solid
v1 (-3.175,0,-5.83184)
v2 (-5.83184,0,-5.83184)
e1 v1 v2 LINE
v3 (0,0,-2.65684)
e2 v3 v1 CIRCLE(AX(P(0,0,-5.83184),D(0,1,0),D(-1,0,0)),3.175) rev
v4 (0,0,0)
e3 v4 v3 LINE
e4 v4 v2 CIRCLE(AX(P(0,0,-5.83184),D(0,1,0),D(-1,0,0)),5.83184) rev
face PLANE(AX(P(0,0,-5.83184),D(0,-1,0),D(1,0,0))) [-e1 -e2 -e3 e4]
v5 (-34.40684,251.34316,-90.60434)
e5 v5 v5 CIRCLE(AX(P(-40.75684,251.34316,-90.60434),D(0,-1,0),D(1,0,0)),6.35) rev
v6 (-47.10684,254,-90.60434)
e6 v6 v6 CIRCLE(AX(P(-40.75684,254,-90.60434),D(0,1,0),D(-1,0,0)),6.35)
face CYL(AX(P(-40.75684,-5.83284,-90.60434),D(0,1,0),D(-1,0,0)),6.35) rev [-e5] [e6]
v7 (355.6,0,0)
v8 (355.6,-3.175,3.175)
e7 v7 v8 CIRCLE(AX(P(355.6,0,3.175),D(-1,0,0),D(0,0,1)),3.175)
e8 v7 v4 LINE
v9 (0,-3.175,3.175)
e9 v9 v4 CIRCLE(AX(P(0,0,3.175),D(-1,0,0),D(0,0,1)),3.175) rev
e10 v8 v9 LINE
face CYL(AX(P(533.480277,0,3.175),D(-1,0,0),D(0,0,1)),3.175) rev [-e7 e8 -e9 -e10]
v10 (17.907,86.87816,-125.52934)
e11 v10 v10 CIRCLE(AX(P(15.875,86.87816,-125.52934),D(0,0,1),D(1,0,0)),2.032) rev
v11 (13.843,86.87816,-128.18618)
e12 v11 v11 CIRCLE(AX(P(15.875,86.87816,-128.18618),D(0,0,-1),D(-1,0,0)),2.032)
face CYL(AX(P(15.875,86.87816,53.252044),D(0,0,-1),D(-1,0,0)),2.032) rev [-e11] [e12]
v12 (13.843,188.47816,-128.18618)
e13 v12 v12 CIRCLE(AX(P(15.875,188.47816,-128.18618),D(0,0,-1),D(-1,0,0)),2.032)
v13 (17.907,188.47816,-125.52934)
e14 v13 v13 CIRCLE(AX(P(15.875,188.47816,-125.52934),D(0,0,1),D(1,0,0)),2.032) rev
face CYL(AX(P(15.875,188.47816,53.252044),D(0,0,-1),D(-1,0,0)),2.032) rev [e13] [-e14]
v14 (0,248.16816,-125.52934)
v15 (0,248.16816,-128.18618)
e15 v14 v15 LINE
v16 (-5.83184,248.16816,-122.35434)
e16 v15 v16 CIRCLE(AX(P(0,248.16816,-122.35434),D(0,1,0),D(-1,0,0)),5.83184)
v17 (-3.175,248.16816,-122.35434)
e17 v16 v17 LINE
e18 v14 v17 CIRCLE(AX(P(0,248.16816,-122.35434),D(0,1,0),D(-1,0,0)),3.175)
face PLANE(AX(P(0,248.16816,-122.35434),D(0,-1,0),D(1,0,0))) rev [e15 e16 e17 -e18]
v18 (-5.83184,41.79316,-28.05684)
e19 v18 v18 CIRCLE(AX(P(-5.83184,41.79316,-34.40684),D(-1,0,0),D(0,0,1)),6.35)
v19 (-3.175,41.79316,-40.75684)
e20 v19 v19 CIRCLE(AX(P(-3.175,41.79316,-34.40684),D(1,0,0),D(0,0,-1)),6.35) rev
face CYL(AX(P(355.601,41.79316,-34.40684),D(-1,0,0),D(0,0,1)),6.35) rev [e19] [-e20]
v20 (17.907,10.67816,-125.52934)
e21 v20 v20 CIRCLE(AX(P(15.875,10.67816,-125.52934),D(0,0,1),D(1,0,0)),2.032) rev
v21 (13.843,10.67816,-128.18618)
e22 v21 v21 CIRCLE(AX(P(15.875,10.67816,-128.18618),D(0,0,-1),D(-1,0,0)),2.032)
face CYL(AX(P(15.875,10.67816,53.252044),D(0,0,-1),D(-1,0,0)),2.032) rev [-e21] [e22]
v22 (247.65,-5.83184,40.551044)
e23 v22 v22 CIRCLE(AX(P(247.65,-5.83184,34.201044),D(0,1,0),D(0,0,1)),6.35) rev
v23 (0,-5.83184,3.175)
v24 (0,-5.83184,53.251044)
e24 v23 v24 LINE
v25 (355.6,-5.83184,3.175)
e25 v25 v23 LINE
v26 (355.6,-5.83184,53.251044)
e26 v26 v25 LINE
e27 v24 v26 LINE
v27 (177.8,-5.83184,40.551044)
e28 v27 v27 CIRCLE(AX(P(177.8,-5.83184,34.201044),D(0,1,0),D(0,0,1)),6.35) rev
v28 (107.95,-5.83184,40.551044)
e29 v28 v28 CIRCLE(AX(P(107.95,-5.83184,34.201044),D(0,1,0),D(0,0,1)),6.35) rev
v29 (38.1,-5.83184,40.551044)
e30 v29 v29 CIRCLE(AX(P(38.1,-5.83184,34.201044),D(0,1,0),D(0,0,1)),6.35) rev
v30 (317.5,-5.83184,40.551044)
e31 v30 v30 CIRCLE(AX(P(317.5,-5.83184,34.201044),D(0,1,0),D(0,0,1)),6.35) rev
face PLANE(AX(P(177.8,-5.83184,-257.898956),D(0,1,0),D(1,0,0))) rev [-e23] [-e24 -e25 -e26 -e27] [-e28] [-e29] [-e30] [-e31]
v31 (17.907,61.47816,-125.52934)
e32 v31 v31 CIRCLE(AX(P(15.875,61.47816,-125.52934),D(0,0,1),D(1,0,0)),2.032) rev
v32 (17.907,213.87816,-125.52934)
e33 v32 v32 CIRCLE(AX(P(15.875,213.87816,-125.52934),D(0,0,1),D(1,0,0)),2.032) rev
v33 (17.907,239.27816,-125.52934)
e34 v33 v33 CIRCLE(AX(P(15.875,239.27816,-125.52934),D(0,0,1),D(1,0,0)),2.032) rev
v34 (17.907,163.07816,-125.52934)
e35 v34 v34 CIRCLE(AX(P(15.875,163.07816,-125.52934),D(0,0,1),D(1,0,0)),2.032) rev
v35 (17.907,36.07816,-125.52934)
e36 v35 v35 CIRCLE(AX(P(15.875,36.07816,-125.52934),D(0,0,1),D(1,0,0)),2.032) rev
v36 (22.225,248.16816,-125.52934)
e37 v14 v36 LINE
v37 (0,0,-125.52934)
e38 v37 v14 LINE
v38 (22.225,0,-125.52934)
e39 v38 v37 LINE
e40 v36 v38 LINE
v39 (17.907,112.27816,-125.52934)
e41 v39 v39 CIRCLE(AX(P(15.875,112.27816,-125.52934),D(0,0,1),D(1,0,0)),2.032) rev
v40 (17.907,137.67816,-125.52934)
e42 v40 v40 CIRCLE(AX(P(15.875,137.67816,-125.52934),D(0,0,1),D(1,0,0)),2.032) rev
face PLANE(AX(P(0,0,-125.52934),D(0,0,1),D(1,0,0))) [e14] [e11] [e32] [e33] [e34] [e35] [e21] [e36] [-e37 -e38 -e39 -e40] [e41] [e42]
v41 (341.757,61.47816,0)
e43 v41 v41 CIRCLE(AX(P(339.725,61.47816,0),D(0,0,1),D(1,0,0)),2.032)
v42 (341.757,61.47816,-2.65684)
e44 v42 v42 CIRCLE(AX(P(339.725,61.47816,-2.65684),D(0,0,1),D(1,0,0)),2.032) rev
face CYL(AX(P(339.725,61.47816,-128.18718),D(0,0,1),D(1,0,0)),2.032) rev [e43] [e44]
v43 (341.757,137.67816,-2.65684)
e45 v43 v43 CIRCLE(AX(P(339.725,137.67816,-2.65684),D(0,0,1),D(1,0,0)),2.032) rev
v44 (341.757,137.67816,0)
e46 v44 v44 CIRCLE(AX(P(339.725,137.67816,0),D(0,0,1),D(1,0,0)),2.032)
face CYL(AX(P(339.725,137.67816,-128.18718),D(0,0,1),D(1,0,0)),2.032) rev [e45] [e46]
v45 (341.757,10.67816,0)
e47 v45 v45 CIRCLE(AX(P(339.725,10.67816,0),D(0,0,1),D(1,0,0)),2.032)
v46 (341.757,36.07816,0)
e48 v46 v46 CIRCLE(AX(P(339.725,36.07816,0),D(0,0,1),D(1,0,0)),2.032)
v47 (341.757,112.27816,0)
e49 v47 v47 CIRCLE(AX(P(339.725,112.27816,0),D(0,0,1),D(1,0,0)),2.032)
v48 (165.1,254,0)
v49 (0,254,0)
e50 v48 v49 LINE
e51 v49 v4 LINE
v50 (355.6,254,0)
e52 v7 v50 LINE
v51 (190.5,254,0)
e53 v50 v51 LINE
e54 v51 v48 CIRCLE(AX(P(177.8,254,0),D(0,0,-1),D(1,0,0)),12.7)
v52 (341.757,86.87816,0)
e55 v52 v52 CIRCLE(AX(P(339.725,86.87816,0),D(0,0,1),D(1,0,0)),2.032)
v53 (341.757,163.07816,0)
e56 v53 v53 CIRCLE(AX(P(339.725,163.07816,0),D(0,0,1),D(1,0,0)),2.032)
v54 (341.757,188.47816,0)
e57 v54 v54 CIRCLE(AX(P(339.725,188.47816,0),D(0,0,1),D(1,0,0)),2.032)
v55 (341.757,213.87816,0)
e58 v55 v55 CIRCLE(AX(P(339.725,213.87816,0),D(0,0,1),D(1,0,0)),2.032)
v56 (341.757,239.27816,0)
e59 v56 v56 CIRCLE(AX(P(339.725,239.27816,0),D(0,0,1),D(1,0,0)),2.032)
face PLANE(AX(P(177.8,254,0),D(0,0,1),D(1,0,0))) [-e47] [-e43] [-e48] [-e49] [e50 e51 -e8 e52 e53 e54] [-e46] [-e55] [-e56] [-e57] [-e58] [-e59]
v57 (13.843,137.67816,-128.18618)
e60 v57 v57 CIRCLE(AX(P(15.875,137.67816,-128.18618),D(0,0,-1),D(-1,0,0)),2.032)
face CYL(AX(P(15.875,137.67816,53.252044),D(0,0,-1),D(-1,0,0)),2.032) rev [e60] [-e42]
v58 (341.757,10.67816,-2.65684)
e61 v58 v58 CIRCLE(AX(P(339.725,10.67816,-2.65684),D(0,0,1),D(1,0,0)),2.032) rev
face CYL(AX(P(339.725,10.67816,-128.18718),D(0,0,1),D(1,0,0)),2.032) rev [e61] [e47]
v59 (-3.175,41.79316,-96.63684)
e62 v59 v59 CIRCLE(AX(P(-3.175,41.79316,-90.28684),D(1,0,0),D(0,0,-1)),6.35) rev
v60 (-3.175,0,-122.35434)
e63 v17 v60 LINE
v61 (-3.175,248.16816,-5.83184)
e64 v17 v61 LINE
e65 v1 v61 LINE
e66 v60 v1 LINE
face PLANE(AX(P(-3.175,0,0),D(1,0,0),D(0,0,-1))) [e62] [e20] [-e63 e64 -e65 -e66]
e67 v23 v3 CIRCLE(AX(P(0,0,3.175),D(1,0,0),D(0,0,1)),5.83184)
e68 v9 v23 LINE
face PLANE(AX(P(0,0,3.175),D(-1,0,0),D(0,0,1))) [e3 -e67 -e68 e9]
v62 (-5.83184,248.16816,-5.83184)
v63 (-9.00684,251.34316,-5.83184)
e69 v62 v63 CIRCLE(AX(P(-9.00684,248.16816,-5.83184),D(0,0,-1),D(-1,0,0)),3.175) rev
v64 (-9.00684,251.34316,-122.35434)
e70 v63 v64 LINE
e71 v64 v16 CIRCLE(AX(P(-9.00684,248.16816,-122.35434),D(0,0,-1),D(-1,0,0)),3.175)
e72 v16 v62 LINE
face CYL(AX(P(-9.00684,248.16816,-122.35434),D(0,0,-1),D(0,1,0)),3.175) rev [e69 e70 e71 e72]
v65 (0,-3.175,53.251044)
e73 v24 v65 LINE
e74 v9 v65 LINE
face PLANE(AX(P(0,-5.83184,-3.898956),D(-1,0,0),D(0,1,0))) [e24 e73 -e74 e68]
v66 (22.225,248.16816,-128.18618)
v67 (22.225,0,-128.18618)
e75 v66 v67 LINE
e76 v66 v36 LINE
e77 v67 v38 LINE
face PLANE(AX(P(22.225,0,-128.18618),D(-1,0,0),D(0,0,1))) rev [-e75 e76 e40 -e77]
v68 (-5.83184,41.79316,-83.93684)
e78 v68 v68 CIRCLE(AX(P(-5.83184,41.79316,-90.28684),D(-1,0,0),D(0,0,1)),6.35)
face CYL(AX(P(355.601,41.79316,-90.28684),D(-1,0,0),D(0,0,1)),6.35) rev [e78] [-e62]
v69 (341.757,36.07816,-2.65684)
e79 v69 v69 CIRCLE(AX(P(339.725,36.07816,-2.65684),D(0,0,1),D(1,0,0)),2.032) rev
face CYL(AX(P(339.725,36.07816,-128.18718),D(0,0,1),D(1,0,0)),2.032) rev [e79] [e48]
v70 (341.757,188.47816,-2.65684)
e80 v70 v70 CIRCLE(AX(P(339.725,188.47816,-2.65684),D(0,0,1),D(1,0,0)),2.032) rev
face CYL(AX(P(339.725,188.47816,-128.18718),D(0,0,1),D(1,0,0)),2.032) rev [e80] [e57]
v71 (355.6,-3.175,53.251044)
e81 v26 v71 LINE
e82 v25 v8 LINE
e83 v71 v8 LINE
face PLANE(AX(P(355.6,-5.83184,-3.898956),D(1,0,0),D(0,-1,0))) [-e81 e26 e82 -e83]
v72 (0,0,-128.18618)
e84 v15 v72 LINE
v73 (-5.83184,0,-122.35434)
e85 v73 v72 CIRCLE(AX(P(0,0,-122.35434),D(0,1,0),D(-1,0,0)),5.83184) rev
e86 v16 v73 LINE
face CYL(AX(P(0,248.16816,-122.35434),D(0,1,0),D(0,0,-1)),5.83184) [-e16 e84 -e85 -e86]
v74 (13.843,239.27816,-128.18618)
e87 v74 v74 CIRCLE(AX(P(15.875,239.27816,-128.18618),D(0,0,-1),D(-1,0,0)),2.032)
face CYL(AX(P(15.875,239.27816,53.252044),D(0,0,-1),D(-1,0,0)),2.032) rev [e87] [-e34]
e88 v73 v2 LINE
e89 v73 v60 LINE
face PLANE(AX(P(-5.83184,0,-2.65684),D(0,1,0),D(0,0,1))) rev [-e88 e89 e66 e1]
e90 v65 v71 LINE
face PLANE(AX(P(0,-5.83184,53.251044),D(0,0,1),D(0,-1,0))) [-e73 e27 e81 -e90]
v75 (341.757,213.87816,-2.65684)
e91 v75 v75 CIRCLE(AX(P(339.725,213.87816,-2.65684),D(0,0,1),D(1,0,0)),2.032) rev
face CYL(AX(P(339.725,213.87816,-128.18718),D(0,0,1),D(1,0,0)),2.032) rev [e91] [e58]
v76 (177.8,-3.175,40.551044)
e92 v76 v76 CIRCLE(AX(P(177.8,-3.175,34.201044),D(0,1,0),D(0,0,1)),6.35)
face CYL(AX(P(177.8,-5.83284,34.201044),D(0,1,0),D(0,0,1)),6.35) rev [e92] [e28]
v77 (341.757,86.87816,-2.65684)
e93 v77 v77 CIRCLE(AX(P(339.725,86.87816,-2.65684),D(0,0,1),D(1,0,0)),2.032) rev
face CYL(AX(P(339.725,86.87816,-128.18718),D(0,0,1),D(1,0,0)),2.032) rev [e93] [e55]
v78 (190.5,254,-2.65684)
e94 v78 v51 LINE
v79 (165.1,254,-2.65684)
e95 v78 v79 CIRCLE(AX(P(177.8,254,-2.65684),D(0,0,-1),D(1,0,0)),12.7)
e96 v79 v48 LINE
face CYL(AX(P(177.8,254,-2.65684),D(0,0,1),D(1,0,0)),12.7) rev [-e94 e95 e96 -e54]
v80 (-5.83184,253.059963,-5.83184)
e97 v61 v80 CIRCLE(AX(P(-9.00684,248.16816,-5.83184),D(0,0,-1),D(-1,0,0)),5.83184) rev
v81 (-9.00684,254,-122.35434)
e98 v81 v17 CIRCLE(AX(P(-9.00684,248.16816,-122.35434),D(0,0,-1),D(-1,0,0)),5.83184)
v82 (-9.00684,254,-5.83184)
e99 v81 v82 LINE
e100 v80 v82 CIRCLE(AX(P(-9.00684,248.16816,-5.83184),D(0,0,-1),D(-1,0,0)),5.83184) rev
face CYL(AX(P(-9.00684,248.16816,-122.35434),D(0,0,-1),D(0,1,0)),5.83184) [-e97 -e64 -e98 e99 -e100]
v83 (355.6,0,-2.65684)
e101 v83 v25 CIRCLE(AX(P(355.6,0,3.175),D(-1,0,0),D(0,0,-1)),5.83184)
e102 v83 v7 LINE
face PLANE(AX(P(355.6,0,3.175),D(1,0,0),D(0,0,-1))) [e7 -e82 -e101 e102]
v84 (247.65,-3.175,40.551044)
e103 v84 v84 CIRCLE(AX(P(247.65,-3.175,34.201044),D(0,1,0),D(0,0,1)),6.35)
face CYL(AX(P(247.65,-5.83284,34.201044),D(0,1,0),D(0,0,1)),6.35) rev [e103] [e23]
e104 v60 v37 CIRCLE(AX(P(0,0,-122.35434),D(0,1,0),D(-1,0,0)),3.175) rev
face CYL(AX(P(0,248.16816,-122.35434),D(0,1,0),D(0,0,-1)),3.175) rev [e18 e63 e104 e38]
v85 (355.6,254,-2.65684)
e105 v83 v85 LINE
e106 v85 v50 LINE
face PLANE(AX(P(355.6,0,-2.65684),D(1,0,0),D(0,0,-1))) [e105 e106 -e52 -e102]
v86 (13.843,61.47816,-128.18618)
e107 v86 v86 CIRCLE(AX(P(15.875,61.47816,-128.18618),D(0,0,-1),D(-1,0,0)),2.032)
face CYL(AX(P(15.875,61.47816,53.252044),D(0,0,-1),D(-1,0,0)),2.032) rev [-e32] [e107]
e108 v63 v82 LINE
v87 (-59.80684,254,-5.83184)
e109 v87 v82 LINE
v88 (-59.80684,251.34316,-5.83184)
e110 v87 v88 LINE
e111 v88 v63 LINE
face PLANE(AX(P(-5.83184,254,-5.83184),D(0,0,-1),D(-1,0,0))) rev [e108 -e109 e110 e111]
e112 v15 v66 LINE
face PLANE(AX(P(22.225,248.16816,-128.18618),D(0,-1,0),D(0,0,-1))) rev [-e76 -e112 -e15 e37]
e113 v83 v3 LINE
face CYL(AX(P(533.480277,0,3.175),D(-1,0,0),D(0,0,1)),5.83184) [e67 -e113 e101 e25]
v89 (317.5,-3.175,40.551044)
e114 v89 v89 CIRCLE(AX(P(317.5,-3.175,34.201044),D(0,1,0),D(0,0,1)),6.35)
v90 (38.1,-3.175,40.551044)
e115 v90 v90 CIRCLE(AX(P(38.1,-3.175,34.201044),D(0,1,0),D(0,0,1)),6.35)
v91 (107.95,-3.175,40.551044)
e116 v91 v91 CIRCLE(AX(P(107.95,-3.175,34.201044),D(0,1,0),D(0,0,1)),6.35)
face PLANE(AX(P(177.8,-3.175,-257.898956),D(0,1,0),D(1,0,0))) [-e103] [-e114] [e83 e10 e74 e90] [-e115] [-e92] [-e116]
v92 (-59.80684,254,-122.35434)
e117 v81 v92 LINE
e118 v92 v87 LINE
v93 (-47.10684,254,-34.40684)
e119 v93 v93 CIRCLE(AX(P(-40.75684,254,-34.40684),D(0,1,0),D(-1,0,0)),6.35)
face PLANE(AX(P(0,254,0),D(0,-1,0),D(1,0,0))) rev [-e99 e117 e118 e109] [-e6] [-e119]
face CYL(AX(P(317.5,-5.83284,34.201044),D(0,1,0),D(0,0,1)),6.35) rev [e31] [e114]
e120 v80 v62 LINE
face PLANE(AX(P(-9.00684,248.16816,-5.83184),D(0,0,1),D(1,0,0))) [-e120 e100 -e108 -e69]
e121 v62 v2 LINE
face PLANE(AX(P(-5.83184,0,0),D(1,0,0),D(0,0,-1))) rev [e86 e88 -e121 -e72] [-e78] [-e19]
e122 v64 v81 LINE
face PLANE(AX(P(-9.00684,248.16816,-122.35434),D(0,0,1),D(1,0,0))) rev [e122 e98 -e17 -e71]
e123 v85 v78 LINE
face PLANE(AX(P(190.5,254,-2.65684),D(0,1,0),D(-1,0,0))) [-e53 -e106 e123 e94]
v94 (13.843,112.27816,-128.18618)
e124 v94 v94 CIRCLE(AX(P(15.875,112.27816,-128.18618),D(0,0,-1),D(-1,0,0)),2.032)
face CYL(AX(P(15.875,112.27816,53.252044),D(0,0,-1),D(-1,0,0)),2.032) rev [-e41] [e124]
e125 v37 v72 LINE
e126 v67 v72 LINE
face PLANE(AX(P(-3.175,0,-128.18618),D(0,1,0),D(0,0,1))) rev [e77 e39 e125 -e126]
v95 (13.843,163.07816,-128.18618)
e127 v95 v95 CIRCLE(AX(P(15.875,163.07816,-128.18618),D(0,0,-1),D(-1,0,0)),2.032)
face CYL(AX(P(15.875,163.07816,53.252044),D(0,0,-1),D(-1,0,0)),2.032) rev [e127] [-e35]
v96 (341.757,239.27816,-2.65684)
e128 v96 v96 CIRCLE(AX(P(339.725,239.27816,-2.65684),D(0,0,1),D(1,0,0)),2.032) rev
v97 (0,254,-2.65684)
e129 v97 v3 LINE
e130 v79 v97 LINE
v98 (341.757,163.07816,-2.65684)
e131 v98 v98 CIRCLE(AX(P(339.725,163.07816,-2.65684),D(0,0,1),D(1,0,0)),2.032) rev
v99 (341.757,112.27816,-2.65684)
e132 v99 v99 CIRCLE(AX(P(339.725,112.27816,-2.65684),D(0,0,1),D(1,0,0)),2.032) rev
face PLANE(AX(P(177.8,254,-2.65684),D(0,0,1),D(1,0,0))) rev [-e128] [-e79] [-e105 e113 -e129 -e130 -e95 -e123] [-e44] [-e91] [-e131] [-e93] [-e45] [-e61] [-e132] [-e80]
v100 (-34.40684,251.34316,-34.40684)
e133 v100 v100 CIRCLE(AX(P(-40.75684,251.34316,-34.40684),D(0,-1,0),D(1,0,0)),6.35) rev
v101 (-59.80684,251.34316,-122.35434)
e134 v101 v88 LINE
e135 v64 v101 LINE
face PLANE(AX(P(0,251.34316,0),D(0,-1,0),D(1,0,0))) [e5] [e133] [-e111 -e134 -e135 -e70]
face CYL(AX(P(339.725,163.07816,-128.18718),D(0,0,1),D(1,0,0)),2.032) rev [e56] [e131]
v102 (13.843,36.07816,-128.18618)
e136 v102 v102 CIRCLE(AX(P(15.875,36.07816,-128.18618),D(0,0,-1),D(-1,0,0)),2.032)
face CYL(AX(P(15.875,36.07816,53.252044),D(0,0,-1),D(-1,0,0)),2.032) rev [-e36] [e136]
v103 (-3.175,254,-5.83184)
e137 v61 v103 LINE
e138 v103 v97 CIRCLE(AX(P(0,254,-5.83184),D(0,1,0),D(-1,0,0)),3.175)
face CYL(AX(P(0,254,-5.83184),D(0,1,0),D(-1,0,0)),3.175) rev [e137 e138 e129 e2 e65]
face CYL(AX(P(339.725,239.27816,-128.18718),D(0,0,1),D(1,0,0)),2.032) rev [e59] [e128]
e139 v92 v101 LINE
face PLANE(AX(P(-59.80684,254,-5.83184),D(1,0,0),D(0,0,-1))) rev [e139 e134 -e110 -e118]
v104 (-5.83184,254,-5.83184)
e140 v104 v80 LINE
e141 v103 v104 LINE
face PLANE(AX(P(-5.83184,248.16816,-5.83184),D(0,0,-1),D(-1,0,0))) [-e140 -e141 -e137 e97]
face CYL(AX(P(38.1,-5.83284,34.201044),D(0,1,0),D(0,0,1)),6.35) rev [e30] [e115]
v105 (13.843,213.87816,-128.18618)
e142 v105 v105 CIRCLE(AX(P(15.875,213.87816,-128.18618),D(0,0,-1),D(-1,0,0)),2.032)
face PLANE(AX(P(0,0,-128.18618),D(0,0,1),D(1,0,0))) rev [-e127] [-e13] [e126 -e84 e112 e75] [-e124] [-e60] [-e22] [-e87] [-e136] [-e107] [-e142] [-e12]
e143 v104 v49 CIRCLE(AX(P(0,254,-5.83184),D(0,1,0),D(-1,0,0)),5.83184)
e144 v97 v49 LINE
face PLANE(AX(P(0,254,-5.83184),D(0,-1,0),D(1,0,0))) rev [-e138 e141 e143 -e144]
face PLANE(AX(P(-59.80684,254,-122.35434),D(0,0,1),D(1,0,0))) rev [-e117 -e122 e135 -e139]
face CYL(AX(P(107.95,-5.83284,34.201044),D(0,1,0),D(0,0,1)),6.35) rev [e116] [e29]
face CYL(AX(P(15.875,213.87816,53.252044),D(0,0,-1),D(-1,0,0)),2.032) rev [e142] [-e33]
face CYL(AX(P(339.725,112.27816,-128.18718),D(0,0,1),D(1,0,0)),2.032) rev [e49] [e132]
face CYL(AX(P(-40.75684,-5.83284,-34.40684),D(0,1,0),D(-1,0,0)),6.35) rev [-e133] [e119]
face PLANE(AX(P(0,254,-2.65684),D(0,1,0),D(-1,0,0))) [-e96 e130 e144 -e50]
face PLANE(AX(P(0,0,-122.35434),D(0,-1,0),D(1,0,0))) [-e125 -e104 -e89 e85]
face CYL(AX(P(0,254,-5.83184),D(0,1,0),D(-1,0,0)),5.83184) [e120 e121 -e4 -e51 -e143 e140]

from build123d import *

# Parameters (mm, degrees)
BASE_FLANGE1_DEPTH           = 2.65684
SKETCHED_BEND3_DEPTH         = 355.6
SKETCHED_BEND3_2_DEPTH       = 355.6
SKETCH10_R                   = 6.35
CUT_EXTRUDE2_DEPTH           = 2.65684
EDGE_FLANGE5_DEPTH           = 254
EDGE_FLANGE6_STRIP_W         = 16.97736
EDGE_FLANGE6_STRIP_H         = 2.65684
EDGE_FLANGE6_STRIP_CUT_DEPTH = 116.5225
EDGE_FLANGE6_DEPTH           = 116.5225
EDGE_FLANGE7_DEPTH           = 248.16816
SKETCH34_R                   = 6.35
CUT_EXTRUDE3_DEPTH           = 2.65684
SKETCH38_R                   = 2.032
CUT_EXTRUDE4_DEPTH           = 2.65684
SKETCH39_R                   = 2.032
CUT_EXTRUDE5_DEPTH           = 2.65684
SKETCH40_R                   = 6.35
CUT_EXTRUDE6_DEPTH           = 2.65684


# Read off the part's stored shape, not the designer's step: Sketched Bend3
# Sheet-metal steps are written as plain solids
with BuildPart() as part:
    # Sketch1 → Base-Flange1 (new body)
    with BuildSketch(Plane.XY):
        with BuildLine():
            Line((0, 0), (0, 254))
            Line((0, 254), (165.1, 254))
            ThreePointArc((165.1, 254), (177.8, 241.3), (190.5, 254))
            Line((190.5, 254), (355.6, 254))
            Line((355.6, 254), (355.6, 0))
            Line((355.6, 0), (355.6, -57.15))
            Line((355.6, -57.15), (0, -57.15))
            Line((0, -57.15), (0, 0))
        make_face()
    extrude(amount=-BASE_FLANGE1_DEPTH)

    # Sketched Bend3 outline → Sketched Bend3 (cut)
    with BuildSketch(Plane.YZ):
        with BuildLine():
            ThreePointArc((0, -2.65684), (-2.783367186, -1.949765838), (-4.891802611, 0))
            Line((-4.891802611, 0), (-57.15, 0))
            Line((-57.15, 0), (-57.15, -2.65684))
            Line((-57.15, -2.65684), (0, -2.65684))
        make_face()
    extrude(amount=SKETCHED_BEND3_DEPTH, mode=Mode.SUBTRACT)

    # Sketched Bend3 2 outline → Sketched Bend3 2 (add)
    with BuildSketch(Plane.YZ):
        with BuildLine():
            ThreePointArc((0, 0), (-2.24506403, 0.92993597), (-3.175, 3.175))
            Line((-3.175, 3.175), (-3.175, 53.251044406))
            Line((-3.175, 53.251044406), (-5.83184, 53.251044406))
            Line((-5.83184, 53.251044406), (-5.83184, 3.175))
            ThreePointArc((-5.83184, 3.175), (-5.591894488, 1.519381136), (-4.891802611, 0))
            Line((-4.891802611, 0), (0, 0))
        make_face()
    extrude(amount=SKETCHED_BEND3_2_DEPTH)

    # Sketch10 → Cut-Extrude2 (cut)
    with BuildSketch(Plane(origin=(0, -3.175, 0), x_dir=(1, 0, 0), z_dir=(0, 1, 0))):
        with Locations(Location((317.5, -34.201044406, 0), (0, 0, 270))):
            Circle(SKETCH10_R)
        with Locations(Location((247.65, -34.201044406, 0), (0, 0, 270))):
            Circle(SKETCH10_R)
        with Locations(Location((38.1, -34.201044406, 0), (0, 0, 270))):
            Circle(SKETCH10_R)
        with Locations(Location((107.95, -34.201044406, 0), (0, 0, 270))):
            Circle(SKETCH10_R)
        with Locations(Location((177.8, -34.201044406, 0), (0, 0, 270))):
            Circle(SKETCH10_R)
    extrude(amount=-CUT_EXTRUDE2_DEPTH, mode=Mode.SUBTRACT)

    # Edge-Flange5 section (across the edge) → Edge-Flange5 (add)
    with BuildSketch(Plane(origin=(-3.175, 0, -2.65684), x_dir=(1, 0, 0), z_dir=(0, 1, 0))):
        with BuildLine():
            Line((-2.65684, 3.175), (-2.65684, 119.6975))
            Line((-2.65684, 119.6975), (0, 119.6975))
            Line((0, 119.6975), (0, 3.175))
            ThreePointArc((0, 3.175), (0.92993597, 0.92993597), (3.175, 0))
            Line((3.175, 0), (3.175, -2.65684))
            ThreePointArc((3.175, -2.65684), (-0.948733611, -0.948733611), (-2.65684, 3.175))
        make_face()
    extrude(amount=EDGE_FLANGE5_DEPTH)

    # Edge-Flange6 strip (across the edge) → Edge-Flange6 strip cut (cut)
    with BuildSketch(Plane(origin=(-5.83184, 254, -5.83184), x_dir=(0, -1, 0), z_dir=(0, 0, -1))):
        with Locations((-2.65684, -1.32842)):
            Rectangle(EDGE_FLANGE6_STRIP_W, EDGE_FLANGE6_STRIP_H)
    extrude(amount=EDGE_FLANGE6_STRIP_CUT_DEPTH, mode=Mode.SUBTRACT)

    # Edge-Flange6 section (across the edge) → Edge-Flange6 (add)
    with BuildSketch(Plane(origin=(-5.83184, 254, -5.83184), x_dir=(0, -1, 0), z_dir=(0, 0, -1))):
        with BuildLine():
            Line((0, 3.175), (0, 53.975))
            Line((0, 53.975), (2.65684, 53.975))
            Line((2.65684, 53.975), (2.65684, 3.175))
            ThreePointArc((2.65684, 3.175), (3.58677597, 0.92993597), (5.83184, 0))
            Line((5.83184, 0), (5.83184, -2.65684))
            ThreePointArc((5.83184, -2.65684), (1.708106389, -0.948733611), (0, 3.175))
        make_face()
    extrude(amount=EDGE_FLANGE6_DEPTH)

    # Edge-Flange7 section (across the edge) → Edge-Flange7 (add)
    with BuildSketch(Plane(origin=(-3.175, 0, -125.52934), x_dir=(0, 0, 1), z_dir=(0, 1, 0))):
        with BuildLine():
            Line((-2.65684, 3.175), (-2.65684, 25.4))
            Line((-2.65684, 25.4), (0, 25.4))
            Line((0, 25.4), (0, 3.175))
            ThreePointArc((0, 3.175), (0.92993597, 0.92993597), (3.175, 0))
            Line((3.175, 0), (3.175, -2.65684))
            ThreePointArc((3.175, -2.65684), (-0.948733611, -0.948733611), (-2.65684, 3.175))
        make_face()
    extrude(amount=EDGE_FLANGE7_DEPTH)

    # Sketch34 → Cut-Extrude3 (cut)
    with BuildSketch(Plane(origin=(0, 254, 0), x_dir=(1, 0, 0), z_dir=(0, 1, 0))):
        with Locations(Location((-40.75684, 90.60434, 0), (0, 0, 180))):
            Circle(SKETCH34_R)
        with Locations(Location((-40.75684, 34.40684, 0), (0, 0, 180))):
            Circle(SKETCH34_R)
    extrude(amount=-CUT_EXTRUDE3_DEPTH, mode=Mode.SUBTRACT)

    # Sketch38 → Cut-Extrude4 (cut)
    with BuildSketch(Plane(origin=(0, 0, -128.18618), x_dir=(-1, 0, 0), z_dir=(0, 0, -1))):
        with Locations((-15.875, 239.27816)):
            Circle(SKETCH38_R)
        with Locations((-15.875, 213.87816)):
            Circle(SKETCH38_R)
        with Locations((-15.875, 188.47816)):
            Circle(SKETCH38_R)
        with Locations((-15.875, 163.07816)):
            Circle(SKETCH38_R)
        with Locations((-15.875, 137.67816)):
            Circle(SKETCH38_R)
        with Locations((-15.875, 112.27816)):
            Circle(SKETCH38_R)
        with Locations((-15.875, 86.87816)):
            Circle(SKETCH38_R)
        with Locations((-15.875, 61.47816)):
            Circle(SKETCH38_R)
        with Locations((-15.875, 36.07816)):
            Circle(SKETCH38_R)
        with Locations((-15.875, 10.67816)):
            Circle(SKETCH38_R)
    extrude(amount=-CUT_EXTRUDE4_DEPTH, mode=Mode.SUBTRACT)

    # Sketch39 → Cut-Extrude5 (cut)
    with BuildSketch(Plane.XY):
        with Locations((339.725, 10.67816)):
            Circle(SKETCH39_R)
        with Locations((339.725, 36.07816)):
            Circle(SKETCH39_R)
        with Locations((339.725, 61.47816)):
            Circle(SKETCH39_R)
        with Locations((339.725, 86.87816)):
            Circle(SKETCH39_R)
        with Locations((339.725, 112.27816)):
            Circle(SKETCH39_R)
        with Locations((339.725, 137.67816)):
            Circle(SKETCH39_R)
        with Locations((339.725, 163.07816)):
            Circle(SKETCH39_R)
        with Locations((339.725, 188.47816)):
            Circle(SKETCH39_R)
        with Locations((339.725, 213.87816)):
            Circle(SKETCH39_R)
        with Locations((339.725, 239.27816)):
            Circle(SKETCH39_R)
    extrude(amount=-CUT_EXTRUDE5_DEPTH, mode=Mode.SUBTRACT)

    # Sketch40 → Cut-Extrude6 (cut)
    with BuildSketch(Plane.ZY.offset(5.83184)):
        with Locations((-34.40684, 41.79316)):
            Circle(SKETCH40_R)
        with Locations((-90.28684, 41.79316)):
            Circle(SKETCH40_R)
    extrude(amount=-CUT_EXTRUDE6_DEPTH, mode=Mode.SUBTRACT)


solid = part.part
